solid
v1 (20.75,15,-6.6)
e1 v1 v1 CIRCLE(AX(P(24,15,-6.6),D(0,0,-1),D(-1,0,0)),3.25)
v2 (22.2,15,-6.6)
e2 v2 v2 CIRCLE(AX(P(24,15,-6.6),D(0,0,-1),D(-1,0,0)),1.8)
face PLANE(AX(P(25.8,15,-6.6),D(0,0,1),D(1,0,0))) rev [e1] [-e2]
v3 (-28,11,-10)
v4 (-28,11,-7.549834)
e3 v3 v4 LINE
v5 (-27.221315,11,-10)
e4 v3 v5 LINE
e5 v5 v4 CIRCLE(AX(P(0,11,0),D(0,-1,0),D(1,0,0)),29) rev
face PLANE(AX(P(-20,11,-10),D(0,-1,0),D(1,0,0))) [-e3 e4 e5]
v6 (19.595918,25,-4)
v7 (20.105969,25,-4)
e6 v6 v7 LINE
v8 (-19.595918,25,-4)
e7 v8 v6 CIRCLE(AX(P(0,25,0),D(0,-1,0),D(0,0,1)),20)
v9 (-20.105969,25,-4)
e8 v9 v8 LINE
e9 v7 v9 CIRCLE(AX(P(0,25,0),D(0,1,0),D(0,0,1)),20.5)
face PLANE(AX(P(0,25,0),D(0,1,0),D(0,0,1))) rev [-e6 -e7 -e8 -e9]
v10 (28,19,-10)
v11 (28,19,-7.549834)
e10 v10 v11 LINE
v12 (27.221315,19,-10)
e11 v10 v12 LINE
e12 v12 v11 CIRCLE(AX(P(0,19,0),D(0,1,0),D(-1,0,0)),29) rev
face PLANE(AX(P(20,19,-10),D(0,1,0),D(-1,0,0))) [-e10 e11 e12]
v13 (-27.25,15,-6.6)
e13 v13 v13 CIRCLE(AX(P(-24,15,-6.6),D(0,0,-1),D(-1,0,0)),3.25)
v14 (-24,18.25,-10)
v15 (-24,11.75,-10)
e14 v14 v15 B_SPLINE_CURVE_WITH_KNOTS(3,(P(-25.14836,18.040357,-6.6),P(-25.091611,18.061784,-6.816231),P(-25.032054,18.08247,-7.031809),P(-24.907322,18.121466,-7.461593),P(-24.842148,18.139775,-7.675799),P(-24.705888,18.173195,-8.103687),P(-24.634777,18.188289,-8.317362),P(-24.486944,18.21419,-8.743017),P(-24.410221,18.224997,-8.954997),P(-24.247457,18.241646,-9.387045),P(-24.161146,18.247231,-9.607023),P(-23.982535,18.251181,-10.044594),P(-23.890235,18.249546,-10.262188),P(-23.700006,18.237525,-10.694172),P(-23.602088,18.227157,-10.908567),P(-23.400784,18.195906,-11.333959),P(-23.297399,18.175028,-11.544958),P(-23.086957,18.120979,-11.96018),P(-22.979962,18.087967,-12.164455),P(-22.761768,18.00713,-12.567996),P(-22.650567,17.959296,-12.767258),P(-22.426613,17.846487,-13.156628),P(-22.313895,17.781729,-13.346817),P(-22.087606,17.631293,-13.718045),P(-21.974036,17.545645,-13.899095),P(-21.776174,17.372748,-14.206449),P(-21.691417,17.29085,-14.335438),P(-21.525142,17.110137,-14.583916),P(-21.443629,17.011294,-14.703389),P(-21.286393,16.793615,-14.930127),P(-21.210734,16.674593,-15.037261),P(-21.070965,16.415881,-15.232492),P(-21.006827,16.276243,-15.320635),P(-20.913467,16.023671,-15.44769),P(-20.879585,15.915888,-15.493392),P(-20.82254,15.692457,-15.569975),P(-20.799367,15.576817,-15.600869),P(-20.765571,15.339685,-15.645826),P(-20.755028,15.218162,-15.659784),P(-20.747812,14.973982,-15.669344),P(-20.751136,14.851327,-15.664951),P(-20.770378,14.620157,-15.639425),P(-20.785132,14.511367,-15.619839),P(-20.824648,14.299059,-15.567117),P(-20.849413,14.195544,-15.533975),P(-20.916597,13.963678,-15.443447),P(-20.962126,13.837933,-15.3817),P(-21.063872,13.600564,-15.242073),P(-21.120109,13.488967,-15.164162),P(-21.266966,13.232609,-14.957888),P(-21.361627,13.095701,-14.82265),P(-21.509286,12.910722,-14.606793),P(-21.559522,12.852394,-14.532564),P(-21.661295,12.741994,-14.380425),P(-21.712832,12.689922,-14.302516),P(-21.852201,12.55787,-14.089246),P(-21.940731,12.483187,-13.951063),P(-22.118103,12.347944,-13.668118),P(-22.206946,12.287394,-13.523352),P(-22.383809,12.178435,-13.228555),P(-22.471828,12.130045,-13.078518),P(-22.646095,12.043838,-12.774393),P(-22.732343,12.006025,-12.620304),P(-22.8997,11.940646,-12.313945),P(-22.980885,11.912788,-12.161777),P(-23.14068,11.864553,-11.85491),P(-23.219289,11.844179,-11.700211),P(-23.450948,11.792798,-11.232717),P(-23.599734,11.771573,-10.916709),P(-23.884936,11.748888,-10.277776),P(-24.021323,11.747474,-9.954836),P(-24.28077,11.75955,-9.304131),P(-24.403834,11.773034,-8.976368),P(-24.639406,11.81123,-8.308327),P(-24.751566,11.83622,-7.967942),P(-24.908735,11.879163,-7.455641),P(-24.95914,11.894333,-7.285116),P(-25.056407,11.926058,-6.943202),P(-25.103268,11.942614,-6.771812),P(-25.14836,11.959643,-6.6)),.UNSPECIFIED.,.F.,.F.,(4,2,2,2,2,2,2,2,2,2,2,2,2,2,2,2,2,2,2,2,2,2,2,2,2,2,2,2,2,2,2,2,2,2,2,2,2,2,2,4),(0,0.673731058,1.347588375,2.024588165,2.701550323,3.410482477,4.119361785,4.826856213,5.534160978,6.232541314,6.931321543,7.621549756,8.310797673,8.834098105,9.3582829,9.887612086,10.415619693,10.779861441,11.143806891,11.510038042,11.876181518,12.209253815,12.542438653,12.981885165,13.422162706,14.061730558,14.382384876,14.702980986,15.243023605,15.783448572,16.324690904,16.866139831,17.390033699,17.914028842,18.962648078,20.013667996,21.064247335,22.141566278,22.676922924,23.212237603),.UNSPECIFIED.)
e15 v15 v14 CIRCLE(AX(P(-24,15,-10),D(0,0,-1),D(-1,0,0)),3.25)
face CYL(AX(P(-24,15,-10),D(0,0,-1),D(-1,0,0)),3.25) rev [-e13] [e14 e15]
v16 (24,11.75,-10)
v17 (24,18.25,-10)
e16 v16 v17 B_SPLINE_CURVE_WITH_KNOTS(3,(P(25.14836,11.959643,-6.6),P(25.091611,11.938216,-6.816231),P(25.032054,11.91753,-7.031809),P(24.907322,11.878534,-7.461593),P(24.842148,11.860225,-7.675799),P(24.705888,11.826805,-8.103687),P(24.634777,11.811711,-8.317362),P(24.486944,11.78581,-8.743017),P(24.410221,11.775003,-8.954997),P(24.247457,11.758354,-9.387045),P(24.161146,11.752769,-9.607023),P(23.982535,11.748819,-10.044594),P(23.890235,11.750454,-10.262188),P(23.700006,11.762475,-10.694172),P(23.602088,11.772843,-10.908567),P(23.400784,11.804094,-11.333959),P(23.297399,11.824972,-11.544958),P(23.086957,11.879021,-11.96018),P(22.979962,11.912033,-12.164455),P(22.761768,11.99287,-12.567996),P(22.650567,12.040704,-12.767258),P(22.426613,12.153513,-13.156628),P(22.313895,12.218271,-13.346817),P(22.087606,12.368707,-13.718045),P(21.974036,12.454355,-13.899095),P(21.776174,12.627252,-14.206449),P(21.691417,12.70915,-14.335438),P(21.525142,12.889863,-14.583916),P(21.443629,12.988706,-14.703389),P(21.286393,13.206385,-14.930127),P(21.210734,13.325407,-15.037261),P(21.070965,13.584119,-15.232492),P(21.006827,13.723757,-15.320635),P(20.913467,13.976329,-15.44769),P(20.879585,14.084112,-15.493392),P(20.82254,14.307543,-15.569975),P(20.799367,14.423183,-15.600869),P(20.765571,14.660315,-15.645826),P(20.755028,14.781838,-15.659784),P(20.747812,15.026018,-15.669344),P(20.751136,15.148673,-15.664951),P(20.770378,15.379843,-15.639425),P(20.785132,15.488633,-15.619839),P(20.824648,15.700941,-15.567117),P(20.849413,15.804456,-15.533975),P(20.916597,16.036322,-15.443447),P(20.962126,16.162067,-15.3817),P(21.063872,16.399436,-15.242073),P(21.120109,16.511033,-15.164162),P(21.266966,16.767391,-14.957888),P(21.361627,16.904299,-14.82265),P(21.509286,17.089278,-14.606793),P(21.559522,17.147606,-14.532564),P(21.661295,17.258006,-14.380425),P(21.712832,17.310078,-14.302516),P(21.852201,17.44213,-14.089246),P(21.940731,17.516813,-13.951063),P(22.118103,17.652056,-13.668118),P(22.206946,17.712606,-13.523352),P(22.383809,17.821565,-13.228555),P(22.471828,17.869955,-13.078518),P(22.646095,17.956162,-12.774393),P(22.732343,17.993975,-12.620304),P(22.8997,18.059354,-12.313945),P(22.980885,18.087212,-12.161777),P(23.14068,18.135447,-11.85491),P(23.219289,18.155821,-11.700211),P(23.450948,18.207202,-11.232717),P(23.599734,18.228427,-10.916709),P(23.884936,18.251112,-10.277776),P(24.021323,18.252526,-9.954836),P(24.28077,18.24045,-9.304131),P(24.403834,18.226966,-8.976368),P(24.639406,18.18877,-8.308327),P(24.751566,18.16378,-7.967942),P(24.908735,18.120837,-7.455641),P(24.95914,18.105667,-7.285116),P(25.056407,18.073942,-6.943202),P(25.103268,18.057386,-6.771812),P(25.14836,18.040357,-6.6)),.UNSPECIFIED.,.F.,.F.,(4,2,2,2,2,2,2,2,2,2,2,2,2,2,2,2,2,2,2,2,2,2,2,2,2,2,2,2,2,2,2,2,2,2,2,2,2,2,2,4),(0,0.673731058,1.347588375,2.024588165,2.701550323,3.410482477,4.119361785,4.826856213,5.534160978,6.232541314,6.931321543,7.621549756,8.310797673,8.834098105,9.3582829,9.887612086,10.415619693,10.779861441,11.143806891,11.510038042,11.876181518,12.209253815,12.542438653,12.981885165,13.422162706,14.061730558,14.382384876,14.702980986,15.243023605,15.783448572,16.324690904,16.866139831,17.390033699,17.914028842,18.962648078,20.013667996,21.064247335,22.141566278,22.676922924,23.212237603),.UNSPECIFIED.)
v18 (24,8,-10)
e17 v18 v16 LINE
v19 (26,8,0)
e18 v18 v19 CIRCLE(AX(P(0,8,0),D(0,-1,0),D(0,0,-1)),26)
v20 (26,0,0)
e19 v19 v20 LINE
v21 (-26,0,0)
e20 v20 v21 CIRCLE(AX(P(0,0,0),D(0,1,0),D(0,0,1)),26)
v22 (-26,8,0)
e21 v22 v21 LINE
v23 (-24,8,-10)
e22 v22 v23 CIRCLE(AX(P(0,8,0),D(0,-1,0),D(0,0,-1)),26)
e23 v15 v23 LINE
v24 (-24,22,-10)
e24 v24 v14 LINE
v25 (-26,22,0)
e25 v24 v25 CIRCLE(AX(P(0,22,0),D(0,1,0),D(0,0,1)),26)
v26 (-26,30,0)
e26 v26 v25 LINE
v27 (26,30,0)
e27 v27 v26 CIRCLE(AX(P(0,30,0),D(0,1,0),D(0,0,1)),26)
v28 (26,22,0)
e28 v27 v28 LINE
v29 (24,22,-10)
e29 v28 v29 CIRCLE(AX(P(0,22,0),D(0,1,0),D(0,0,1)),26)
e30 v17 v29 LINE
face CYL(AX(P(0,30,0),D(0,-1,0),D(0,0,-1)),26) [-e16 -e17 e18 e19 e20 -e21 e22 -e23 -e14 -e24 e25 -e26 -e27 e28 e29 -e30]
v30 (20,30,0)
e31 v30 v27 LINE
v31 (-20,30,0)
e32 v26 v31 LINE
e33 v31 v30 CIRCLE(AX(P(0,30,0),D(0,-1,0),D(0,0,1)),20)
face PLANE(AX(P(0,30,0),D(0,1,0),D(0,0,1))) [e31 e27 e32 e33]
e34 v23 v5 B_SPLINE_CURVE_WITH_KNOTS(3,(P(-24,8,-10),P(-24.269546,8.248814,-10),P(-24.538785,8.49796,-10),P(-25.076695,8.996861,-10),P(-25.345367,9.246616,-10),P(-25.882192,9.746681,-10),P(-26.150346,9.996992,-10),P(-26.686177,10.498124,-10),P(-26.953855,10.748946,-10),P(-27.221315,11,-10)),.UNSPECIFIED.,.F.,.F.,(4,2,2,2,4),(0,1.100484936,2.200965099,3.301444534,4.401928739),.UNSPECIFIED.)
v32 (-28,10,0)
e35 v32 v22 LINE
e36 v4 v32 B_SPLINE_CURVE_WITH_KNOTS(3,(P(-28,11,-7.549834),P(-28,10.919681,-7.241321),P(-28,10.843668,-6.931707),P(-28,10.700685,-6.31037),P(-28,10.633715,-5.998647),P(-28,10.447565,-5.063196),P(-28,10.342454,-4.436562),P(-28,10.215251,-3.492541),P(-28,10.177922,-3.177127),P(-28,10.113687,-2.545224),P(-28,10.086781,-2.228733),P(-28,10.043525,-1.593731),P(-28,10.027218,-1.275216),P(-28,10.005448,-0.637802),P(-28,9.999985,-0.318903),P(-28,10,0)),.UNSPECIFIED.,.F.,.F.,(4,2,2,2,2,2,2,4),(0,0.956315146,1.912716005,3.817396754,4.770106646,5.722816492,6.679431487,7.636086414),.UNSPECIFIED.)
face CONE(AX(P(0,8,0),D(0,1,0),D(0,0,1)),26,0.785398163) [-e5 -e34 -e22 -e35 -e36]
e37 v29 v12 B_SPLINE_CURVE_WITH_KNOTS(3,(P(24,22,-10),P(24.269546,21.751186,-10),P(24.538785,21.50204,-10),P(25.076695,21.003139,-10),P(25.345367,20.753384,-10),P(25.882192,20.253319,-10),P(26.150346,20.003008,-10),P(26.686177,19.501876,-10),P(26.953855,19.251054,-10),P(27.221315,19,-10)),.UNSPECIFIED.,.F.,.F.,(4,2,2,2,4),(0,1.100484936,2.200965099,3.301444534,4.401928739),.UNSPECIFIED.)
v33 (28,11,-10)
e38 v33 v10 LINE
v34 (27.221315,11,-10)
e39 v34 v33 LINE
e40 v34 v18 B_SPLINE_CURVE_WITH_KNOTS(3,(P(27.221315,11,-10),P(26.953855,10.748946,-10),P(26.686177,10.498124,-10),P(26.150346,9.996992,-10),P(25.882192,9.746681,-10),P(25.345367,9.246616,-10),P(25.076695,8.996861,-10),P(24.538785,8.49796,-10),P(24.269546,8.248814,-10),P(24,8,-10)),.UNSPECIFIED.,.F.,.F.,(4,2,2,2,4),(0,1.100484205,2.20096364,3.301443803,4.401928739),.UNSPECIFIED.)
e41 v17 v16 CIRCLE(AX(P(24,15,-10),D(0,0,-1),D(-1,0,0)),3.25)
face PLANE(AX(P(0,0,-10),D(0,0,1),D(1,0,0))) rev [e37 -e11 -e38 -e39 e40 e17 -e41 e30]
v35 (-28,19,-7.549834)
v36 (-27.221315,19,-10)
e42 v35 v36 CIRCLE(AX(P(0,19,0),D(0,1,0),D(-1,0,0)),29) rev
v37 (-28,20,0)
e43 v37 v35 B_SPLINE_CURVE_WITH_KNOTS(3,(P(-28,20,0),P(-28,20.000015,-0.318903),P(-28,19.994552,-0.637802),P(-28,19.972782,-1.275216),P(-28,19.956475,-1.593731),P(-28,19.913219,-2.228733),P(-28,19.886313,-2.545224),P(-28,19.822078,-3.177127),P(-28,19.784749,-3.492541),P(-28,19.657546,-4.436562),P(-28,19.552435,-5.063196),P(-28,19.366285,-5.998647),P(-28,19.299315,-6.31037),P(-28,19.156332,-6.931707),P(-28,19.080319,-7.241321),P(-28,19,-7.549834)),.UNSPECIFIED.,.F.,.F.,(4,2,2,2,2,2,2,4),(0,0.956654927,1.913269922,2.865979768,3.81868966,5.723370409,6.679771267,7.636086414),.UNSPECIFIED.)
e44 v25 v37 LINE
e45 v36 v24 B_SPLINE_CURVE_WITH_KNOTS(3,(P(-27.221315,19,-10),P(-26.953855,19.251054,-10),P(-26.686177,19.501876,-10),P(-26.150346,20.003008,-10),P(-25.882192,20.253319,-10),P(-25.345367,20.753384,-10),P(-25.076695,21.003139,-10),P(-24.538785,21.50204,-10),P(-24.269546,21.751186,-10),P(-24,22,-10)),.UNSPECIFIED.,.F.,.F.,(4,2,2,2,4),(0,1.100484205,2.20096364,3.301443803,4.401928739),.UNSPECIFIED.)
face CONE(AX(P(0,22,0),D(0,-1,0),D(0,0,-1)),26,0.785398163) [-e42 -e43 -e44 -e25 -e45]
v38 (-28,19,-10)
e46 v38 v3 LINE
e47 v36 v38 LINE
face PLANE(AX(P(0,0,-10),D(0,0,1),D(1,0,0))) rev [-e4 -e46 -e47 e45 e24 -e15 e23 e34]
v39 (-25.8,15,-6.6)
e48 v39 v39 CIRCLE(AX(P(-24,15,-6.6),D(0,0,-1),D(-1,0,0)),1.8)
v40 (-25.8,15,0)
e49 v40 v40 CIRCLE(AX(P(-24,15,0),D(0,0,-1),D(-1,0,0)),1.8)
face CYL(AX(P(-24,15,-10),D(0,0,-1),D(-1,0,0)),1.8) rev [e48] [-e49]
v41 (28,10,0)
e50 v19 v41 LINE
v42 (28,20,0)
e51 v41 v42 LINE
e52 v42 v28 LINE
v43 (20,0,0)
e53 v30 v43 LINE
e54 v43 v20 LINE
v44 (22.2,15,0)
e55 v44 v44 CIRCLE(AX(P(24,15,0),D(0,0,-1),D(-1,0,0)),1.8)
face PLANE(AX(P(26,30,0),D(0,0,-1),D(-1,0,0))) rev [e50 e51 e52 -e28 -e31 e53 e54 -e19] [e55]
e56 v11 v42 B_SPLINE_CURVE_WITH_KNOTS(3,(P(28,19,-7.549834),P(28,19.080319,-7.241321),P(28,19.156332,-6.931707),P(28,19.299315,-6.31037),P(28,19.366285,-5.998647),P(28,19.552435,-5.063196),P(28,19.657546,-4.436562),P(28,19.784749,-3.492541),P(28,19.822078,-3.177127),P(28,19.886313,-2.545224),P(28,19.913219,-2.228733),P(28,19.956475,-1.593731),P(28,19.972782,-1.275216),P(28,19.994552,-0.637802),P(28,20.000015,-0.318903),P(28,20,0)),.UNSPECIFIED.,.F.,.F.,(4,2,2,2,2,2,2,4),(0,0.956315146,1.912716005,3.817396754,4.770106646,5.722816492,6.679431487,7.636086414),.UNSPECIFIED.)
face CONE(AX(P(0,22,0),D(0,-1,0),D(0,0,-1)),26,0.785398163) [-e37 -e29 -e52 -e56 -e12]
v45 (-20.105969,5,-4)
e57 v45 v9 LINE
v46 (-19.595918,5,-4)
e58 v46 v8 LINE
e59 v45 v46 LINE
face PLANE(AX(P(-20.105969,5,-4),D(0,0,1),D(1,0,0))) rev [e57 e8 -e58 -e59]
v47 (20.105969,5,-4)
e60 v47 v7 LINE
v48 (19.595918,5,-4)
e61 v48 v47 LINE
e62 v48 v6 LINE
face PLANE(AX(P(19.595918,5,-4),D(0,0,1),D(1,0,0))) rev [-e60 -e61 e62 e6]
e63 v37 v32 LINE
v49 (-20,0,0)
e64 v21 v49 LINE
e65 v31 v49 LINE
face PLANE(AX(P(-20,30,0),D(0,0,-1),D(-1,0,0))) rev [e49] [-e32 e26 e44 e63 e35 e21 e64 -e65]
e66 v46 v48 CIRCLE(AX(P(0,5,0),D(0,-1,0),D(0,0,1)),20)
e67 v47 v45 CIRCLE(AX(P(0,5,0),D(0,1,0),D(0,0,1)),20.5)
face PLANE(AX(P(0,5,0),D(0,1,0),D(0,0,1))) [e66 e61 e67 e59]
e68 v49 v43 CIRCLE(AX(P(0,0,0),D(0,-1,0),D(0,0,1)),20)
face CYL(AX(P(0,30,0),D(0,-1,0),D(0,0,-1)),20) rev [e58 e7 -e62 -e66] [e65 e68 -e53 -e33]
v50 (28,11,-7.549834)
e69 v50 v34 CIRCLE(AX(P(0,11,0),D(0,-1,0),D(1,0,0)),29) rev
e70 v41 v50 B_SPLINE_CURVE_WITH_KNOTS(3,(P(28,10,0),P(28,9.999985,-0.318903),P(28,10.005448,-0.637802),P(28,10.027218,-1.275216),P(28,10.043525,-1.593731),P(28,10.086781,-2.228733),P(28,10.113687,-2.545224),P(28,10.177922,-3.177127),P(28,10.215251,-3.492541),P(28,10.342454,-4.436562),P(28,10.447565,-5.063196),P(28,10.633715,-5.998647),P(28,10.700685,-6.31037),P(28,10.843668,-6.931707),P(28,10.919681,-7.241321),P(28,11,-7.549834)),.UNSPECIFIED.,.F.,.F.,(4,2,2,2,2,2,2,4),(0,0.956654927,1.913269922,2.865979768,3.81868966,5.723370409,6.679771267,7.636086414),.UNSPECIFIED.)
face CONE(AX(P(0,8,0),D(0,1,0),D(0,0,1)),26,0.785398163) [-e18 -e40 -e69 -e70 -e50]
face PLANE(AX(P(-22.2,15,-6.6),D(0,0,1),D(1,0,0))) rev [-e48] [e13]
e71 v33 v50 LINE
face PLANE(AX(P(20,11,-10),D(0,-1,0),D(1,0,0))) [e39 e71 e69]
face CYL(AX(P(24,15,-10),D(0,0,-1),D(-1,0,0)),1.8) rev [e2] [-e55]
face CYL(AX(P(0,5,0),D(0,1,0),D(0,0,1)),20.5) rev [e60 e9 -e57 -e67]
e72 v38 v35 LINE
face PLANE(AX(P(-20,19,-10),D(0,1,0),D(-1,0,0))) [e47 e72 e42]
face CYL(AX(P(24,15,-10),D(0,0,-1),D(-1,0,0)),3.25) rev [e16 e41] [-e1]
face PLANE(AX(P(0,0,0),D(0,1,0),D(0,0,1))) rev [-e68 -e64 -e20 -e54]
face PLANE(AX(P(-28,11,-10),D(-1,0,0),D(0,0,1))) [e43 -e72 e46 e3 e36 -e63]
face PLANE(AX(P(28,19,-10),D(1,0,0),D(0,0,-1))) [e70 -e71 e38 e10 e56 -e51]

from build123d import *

# Parameters (mm, degrees)
BOSS_EXTRUDE1_DEPTH                          = 30
SKETCH2_W                                    = 8
SKETCH2_H                                    = 8
BOSS_EXTRUDE2_DEPTH                          = 10
CBORE_FOR_M3_HEX_SOCKET_HEAD_CAP_SCR_2_COUNT = 2
CBORE_FOR_M3_HEX_SOCKET_HEAD_CAP_SCR_2_PITCH = 48
SKETCH21_R                                   = 3.25
CUT_EXTRUDE2_DEPTH                           = 46.391188572
CUT_EXTRUDE3_START                           = -25
CUT_EXTRUDE3_DEPTH                           = 20
CHAMFER1_SIZE                                = 3


with BuildPart() as part:
    # Sketch1 → Boss-Extrude1 (new body)
    with BuildSketch(Plane(origin=(0, 0, 0), x_dir=(1, 0, 0), z_dir=(0, 1, 0))):
        with BuildLine():
            Line((26, 0), (20, 0))
            ThreePointArc((20, 0), (0, 20), (-20, 0))
            Line((-20, 0), (-26, 0))
            ThreePointArc((-26, 0), (0, 26), (26, 0))
        make_face()
    extrude(amount=BOSS_EXTRUDE1_DEPTH)

    # Sketch2 → Boss-Extrude2 (add)
    with BuildSketch(Plane.XY):
        with Locations((24, 15)):
            Rectangle(SKETCH2_W, SKETCH2_H)
        with Locations((-24, 15)):
            Rectangle(SKETCH2_W, SKETCH2_H)
    extrude(amount=-BOSS_EXTRUDE2_DEPTH)

    # Sketch20 → CBORE for M3 Hex Socket Head Cap Screw4 (revolve, cut)
    with BuildSketch(Plane(origin=(24, 15, -10), x_dir=(0, 1, 0), z_dir=(1, 0, 0))):
        Polygon((0, 0), (0, 10), (1.8, 10), (1.8, 3.4), (3.25, 3.4), (3.25, 0), align=None)
    cbore_for_m3_hex_socket_head_cap_screw4 = revolve(axis=Axis((24, 15, -16.35), (0, 0, 1)), mode=Mode.SUBTRACT)

    # CBORE for M3 Hex Socket Head Cap Scr 2: CBORE for M3 Hex Socket Head Cap Screw4 ×2
    with Locations(*[(-i * CBORE_FOR_M3_HEX_SOCKET_HEAD_CAP_SCR_2_PITCH, 0, 0) for i in range(1, CBORE_FOR_M3_HEX_SOCKET_HEAD_CAP_SCR_2_COUNT)]):
        add(cbore_for_m3_hex_socket_head_cap_screw4, mode=Mode.SUBTRACT)

    # Sketch21 → Cut-Extrude2 (cut, through all)
    with BuildSketch(Plane(origin=(0, 0, -6.6), x_dir=(-1, 0, 0), z_dir=(0, 0, -1))):
        with Locations((24, 15)):
            Circle(SKETCH21_R)
        with Locations((-24, 15)):
            Circle(SKETCH21_R)
    extrude(amount=CUT_EXTRUDE2_DEPTH, mode=Mode.SUBTRACT)

    # Sketch22 → Cut-Extrude3 (cut)
    with BuildSketch(Plane(origin=(0, 30, 0), x_dir=(1, 0, 0), z_dir=(0, 1, 0)).offset(CUT_EXTRUDE3_START)):
        with BuildLine():
            Line((-20.105969263, 4), (-19.595917942, 4))
            ThreePointArc((-19.595917942, 4), (0, 20), (19.595917942, 4))
            Line((19.595917942, 4), (20.105969263, 4))
            ThreePointArc((20.105969263, 4), (0, 20.5), (-20.105969263, 4))
        make_face()
    extrude(amount=CUT_EXTRUDE3_DEPTH, mode=Mode.SUBTRACT)

    # Chamfer1
    # the kernel refuses this chamfer: 3 mm, written as the material it adds along each edge
    with BuildSketch(Plane(origin=(0, 11, 0), x_dir=(0.7702703819055875, 0, -0.6377174442956852), z_dir=(-0.6377174442956852, 0, -0.7702703819055875))) as chamfer1_piece_1_section:
        Polygon((26, CHAMFER1_SIZE), (26 + CHAMFER1_SIZE, 0), (26, 0), align=None)
    chamfer1_piece_1 = revolve(axis=Axis((0, 11, 0), (0, -1, 0)), revolution_arc=39.621824877, mode=Mode.PRIVATE)
    chamfer1_piece_1 = split(chamfer1_piece_1, bisect_by=Plane(origin=(26.235677781, 9.966963305, -10), z_dir=(0, 0, 1)), keep=Keep.TOP, mode=Mode.PRIVATE)
    chamfer1_piece_1 = split(chamfer1_piece_1, bisect_by=Plane(origin=(28, 9.966963305, -5.200282344), z_dir=(-1, 0, 0)), keep=Keep.TOP, mode=Mode.PRIVATE)
    add(chamfer1_piece_1)
    with BuildSketch(Plane(origin=(0, 19, 0), x_dir=(0.7702703819055875, 0, -0.6377174442956852), z_dir=(-0.6377174442956852, 0, -0.7702703819055875))) as chamfer1_piece_2_section:
        Polygon((26, -CHAMFER1_SIZE), (26 + CHAMFER1_SIZE, 0), (26, 0), align=None)
    chamfer1_piece_2 = revolve(axis=Axis((0, 19, 0), (0, -1, 0)), revolution_arc=39.621824877, mode=Mode.PRIVATE)
    chamfer1_piece_2 = split(chamfer1_piece_2, bisect_by=Plane(origin=(26.235677781, 20.033036695, -10), z_dir=(0, 0, 1)), keep=Keep.TOP, mode=Mode.PRIVATE)
    chamfer1_piece_2 = split(chamfer1_piece_2, bisect_by=Plane(origin=(28, 20.033036695, -5.200282344), z_dir=(-1, 0, 0)), keep=Keep.TOP, mode=Mode.PRIVATE)
    add(chamfer1_piece_2)
    with BuildSketch(Plane(origin=(0, 19, 0), x_dir=(-1, 0, 0), z_dir=(0, 0, 1))) as chamfer1_piece_3_section:
        Polygon((26, -CHAMFER1_SIZE), (26 + CHAMFER1_SIZE, 0), (26, 0), align=None)
    chamfer1_piece_3 = revolve(axis=Axis((0, 19, 0), (0, -1, 0)), revolution_arc=39.621824877, mode=Mode.PRIVATE)
    chamfer1_piece_3 = split(chamfer1_piece_3, bisect_by=Plane(origin=(-26.235677756, 20.033036715, -10), z_dir=(0, 0, 1)), keep=Keep.TOP, mode=Mode.PRIVATE)
    chamfer1_piece_3 = split(chamfer1_piece_3, bisect_by=Plane(origin=(-28, 20.033036715, -5.200282276), z_dir=(1, 0, 0)), keep=Keep.TOP, mode=Mode.PRIVATE)
    add(chamfer1_piece_3)
    with BuildSketch(Plane(origin=(0, 11, 0), x_dir=(-1, 0, 0), z_dir=(0, 0, 1))) as chamfer1_piece_4_section:
        Polygon((26, CHAMFER1_SIZE), (26 + CHAMFER1_SIZE, 0), (26, 0), align=None)
    chamfer1_piece_4 = revolve(axis=Axis((0, 11, 0), (0, -1, 0)), revolution_arc=39.621824877, mode=Mode.PRIVATE)
    chamfer1_piece_4 = split(chamfer1_piece_4, bisect_by=Plane(origin=(-26.235677756, 9.966963285, -10), z_dir=(0, 0, 1)), keep=Keep.TOP, mode=Mode.PRIVATE)
    chamfer1_piece_4 = split(chamfer1_piece_4, bisect_by=Plane(origin=(-28, 9.966963285, -5.200282276), z_dir=(1, 0, 0)), keep=Keep.TOP, mode=Mode.PRIVATE)
    add(chamfer1_piece_4)


solid = part.part
